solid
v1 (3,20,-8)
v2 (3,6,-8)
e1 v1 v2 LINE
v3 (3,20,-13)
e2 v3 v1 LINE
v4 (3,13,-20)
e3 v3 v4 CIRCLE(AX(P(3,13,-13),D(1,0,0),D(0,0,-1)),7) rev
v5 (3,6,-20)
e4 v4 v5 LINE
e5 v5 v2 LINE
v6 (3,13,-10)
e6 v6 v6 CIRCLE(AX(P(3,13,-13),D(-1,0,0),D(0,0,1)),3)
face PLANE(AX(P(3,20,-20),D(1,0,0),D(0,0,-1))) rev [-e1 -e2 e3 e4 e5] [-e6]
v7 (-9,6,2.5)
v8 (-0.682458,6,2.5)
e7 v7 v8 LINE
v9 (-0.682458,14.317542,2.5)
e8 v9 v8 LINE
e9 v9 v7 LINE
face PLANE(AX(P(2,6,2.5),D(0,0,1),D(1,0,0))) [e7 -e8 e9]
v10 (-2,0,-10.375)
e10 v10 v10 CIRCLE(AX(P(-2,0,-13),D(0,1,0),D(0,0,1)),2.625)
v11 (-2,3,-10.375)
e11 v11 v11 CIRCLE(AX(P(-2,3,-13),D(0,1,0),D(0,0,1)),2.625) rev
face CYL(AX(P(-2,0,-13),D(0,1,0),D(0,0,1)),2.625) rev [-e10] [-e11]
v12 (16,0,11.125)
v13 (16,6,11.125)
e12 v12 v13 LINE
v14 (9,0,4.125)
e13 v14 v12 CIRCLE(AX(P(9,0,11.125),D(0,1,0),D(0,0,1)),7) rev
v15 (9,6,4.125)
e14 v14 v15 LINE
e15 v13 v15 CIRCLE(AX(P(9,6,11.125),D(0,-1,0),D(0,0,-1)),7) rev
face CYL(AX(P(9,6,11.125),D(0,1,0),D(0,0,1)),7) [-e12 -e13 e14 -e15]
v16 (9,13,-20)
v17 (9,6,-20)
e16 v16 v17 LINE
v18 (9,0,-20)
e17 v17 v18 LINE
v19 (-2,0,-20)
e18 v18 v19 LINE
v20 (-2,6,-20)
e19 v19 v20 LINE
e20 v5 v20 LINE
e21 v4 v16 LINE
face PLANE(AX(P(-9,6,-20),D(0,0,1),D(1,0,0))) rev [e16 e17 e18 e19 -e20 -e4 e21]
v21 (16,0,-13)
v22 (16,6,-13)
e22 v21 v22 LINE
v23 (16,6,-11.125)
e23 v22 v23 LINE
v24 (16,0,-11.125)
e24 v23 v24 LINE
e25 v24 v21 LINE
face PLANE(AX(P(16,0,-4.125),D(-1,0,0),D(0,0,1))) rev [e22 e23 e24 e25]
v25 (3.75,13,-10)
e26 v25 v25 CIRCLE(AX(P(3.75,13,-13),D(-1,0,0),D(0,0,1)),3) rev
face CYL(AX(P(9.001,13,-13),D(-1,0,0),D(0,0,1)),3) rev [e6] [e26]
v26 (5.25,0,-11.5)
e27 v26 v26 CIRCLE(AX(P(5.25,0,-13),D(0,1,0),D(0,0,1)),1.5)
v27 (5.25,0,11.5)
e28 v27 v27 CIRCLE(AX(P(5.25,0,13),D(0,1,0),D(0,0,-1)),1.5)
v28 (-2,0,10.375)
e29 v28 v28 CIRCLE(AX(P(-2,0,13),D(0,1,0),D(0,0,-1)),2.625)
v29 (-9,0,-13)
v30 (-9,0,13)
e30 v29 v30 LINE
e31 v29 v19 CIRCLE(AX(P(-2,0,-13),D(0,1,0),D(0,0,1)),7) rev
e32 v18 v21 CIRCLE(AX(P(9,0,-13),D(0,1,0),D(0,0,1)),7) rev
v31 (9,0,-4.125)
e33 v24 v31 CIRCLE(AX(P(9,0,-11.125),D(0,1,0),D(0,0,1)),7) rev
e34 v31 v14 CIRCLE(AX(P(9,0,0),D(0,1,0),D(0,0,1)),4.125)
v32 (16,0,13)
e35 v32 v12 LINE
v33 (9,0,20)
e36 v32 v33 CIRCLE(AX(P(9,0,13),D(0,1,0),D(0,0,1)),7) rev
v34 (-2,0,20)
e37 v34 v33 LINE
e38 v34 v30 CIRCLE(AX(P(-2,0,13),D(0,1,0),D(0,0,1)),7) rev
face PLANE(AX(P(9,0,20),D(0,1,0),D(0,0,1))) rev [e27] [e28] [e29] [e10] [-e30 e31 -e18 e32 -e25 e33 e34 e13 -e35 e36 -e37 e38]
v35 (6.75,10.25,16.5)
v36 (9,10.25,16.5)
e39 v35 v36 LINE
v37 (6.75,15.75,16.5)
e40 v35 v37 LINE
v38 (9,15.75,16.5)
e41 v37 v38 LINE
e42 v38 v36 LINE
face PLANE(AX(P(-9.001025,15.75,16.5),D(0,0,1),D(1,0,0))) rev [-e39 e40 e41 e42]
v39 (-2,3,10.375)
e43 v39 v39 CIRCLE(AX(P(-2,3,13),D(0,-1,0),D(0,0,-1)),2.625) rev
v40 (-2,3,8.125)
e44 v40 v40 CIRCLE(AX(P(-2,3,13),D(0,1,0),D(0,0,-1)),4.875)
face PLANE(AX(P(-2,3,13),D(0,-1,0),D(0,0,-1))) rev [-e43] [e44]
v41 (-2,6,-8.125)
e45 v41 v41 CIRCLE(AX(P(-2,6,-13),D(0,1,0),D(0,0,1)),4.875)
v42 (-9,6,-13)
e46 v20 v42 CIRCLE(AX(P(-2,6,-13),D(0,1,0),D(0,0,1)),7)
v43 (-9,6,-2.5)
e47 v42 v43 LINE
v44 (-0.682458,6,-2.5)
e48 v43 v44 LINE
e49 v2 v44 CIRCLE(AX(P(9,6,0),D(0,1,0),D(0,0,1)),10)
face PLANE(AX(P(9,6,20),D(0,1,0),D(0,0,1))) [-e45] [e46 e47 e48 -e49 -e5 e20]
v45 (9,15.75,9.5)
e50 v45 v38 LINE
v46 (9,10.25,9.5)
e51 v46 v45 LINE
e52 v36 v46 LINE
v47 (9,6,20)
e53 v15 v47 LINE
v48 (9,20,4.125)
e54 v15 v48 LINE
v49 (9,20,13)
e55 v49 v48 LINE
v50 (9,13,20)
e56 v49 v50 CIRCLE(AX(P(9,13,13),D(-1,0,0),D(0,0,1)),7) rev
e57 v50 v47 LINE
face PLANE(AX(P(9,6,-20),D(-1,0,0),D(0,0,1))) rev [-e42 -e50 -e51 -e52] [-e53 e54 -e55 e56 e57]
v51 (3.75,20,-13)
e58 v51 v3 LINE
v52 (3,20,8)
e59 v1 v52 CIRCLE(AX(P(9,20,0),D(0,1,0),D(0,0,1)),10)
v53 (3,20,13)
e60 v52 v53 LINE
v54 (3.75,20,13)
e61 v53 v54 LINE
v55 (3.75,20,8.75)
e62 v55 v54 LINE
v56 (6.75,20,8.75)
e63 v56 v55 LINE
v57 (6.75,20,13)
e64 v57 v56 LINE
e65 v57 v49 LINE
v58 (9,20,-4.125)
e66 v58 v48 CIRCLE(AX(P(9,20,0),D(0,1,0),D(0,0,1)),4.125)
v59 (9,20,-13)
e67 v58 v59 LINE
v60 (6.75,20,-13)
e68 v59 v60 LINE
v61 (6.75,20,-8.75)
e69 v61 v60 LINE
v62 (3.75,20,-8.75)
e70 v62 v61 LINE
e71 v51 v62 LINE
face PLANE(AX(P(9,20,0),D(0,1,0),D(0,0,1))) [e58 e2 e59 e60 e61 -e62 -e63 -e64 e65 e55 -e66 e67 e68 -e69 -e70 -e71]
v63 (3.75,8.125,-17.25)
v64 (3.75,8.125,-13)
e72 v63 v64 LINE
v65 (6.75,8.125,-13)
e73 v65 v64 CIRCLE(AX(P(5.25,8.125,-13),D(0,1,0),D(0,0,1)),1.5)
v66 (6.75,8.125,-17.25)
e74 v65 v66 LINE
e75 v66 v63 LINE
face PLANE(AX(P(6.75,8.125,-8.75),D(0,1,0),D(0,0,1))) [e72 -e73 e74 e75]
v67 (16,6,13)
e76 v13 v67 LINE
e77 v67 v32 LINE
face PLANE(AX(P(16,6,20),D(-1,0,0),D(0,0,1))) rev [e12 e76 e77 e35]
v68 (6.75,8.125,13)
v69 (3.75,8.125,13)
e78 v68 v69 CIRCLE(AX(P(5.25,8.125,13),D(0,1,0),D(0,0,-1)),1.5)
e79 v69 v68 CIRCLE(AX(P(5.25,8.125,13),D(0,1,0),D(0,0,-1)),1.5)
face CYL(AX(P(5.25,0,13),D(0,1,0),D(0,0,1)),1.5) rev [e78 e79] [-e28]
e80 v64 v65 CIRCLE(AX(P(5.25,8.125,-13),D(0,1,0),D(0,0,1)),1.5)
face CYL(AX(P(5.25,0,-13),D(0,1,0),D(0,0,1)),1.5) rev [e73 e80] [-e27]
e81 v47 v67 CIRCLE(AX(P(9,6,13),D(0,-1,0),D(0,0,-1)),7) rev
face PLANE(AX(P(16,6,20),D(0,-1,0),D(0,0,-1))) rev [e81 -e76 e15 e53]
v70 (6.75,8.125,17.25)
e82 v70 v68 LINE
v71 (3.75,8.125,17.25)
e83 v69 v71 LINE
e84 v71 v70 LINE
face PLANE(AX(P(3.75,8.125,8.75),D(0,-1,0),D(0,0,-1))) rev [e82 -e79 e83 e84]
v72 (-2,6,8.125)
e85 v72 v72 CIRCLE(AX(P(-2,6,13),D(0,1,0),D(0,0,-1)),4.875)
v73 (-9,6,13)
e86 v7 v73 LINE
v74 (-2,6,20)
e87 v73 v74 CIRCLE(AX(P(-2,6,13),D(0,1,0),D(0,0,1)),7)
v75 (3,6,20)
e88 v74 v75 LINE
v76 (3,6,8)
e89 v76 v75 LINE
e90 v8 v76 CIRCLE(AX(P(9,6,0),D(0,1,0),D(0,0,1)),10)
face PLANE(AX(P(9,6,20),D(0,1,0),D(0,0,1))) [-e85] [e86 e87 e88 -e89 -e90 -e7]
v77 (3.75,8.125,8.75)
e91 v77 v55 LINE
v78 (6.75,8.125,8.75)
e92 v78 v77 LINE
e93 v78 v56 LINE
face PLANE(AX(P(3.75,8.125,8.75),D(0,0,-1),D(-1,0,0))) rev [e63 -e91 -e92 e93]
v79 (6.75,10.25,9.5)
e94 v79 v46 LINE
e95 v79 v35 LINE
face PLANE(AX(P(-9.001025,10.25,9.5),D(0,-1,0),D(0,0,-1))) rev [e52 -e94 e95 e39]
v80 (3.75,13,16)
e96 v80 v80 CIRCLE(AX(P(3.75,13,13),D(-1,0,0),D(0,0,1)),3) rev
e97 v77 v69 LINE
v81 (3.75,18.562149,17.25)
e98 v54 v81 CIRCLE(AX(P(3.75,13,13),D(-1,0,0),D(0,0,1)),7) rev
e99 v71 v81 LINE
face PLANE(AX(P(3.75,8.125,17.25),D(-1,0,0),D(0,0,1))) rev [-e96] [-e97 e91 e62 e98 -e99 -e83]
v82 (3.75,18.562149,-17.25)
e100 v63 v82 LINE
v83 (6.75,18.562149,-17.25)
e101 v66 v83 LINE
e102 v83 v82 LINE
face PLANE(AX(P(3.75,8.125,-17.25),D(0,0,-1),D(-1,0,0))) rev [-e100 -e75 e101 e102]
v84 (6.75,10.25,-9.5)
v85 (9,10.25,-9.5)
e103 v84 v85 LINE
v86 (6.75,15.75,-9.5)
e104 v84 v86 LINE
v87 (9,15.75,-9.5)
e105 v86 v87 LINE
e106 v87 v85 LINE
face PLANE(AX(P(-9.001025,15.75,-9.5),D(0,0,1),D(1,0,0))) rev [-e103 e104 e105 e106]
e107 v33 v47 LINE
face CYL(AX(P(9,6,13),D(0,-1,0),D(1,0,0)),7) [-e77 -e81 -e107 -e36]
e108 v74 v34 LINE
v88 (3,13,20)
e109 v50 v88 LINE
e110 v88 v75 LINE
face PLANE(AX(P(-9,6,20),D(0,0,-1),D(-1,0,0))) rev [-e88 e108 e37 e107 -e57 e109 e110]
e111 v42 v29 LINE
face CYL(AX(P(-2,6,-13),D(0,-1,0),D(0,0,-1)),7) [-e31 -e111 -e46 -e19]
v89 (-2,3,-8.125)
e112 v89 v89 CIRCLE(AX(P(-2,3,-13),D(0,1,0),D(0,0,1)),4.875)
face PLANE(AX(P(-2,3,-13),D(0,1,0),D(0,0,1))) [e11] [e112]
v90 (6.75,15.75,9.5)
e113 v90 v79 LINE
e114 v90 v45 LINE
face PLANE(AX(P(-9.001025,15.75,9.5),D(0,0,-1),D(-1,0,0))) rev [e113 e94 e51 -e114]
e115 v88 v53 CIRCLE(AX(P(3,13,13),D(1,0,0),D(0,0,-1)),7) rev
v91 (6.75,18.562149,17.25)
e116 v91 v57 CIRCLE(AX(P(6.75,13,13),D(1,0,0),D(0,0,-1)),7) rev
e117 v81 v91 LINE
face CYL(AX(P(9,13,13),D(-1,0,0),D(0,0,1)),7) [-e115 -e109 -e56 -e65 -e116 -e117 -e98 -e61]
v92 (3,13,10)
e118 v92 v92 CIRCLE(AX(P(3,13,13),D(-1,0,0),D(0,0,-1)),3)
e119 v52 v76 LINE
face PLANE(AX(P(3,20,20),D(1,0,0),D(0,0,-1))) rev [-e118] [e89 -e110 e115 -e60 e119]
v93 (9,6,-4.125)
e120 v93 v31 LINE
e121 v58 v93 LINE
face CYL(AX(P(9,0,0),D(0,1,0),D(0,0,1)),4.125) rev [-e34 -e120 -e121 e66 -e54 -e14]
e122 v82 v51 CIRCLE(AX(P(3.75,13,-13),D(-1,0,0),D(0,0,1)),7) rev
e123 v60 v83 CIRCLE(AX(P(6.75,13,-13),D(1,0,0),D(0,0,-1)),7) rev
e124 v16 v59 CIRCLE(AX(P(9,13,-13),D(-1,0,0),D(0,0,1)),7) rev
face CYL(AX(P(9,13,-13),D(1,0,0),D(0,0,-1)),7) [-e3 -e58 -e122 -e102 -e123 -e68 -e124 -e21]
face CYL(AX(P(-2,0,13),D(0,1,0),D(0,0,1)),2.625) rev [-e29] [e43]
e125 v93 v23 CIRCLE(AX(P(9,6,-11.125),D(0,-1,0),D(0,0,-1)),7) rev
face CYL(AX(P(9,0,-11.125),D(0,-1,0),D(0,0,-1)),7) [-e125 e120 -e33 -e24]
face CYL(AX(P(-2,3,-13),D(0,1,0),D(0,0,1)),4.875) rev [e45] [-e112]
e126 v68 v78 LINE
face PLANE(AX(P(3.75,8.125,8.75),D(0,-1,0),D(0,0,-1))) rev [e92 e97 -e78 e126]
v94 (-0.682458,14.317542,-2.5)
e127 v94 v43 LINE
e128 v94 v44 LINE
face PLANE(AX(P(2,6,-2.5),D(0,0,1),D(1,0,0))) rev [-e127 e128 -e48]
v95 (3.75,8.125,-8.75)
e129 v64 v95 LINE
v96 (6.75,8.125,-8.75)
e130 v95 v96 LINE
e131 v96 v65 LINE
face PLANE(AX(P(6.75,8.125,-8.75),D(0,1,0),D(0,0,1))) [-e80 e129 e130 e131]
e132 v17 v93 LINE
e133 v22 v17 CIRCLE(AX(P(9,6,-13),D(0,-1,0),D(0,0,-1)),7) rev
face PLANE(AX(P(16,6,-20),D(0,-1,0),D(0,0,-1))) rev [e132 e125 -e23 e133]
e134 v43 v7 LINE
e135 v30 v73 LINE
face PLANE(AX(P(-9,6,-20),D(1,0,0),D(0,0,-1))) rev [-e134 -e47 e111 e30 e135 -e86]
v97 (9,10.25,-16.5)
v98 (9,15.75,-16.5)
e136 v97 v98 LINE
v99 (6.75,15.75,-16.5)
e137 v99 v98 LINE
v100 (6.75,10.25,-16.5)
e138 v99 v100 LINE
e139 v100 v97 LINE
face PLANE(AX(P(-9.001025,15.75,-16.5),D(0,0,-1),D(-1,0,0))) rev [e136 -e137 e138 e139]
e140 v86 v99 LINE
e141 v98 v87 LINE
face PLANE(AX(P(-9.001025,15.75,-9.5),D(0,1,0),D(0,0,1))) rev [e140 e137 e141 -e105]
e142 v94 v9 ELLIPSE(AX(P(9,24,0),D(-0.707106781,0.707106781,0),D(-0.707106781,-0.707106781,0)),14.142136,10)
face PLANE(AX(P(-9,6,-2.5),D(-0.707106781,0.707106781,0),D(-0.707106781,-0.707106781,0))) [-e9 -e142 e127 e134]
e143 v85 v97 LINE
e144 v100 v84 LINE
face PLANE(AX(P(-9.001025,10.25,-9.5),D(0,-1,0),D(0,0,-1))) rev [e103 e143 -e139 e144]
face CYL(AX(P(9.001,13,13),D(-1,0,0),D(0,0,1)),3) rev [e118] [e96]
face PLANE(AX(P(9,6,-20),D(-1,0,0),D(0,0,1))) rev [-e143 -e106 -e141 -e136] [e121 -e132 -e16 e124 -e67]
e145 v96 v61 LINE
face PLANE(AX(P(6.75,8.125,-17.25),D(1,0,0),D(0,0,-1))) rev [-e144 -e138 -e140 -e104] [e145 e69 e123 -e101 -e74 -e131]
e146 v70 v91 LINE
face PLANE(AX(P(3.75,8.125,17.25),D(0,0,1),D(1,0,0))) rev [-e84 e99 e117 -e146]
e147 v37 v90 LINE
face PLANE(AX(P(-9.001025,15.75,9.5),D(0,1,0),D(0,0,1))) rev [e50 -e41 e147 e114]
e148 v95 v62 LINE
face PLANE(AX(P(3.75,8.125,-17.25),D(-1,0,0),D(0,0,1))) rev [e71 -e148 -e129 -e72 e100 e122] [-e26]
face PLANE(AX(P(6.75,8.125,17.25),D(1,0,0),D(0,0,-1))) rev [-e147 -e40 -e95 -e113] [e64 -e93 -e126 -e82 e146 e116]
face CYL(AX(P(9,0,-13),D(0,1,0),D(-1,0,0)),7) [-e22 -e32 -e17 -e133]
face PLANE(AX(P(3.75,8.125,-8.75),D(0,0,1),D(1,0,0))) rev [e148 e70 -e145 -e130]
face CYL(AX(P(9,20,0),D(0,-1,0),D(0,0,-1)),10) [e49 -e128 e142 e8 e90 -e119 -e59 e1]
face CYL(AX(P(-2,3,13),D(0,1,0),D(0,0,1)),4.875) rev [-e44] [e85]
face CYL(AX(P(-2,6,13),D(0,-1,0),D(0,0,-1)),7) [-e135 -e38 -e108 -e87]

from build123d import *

# Parameters (mm, degrees)
SKETCH1_W                = 18
SKETCH1_H                = 40
BOSS_EXTRUDE1_DEPTH      = 6
BOSS_EXTRUDE2_DEPTH      = 14
SKETCH3_R                = 4.125
CUT_EXTRUDE1_DEPTH       = 30.681644159
FILLET1_R                = 7
SKETCH12_W               = 3
SKETCH12_H               = 8.5
CUT_EXTRUDE7_DEPTH       = 11.875
SKETCH13_R               = 1.5
CUT_EXTRUDE8_DEPTH       = 25.940241077
CUT_EXTRUDE9_REACH       = 32.725
SKETCH14_R               = 3
CUT_EXTRUDE10_REACH      = 35.526
SKETCH15_W               = 7
SKETCH15_H               = 5.5
SKETCH7_W                = 15.875
SKETCH7_H                = 6
BOSS_EXTRUDE3_DEPTH      = 7
FILLET2_R                = 7
SKETCH8_R                = 2.625
CUT_EXTRUDE4_DEPTH       = 30.189039039
BOSS_EXTRUDE4_DEPTH      = 2.5
BOSS_EXTRUDE4_DEPTH_BACK = 2.5
SKETCH10_R               = 4.875
CUT_EXTRUDE5_DEPTH       = 3


with BuildPart() as part:
    # Sketch1 → Boss-Extrude1 (new body)
    with BuildSketch(Plane(origin=(0, 0, 0), x_dir=(1, 0, 0), z_dir=(0, 1, 0))):
        Rectangle(SKETCH1_W, SKETCH1_H)
    extrude(amount=BOSS_EXTRUDE1_DEPTH)

    # Sketch2 → Boss-Extrude2 (add)
    with BuildSketch(Plane(origin=(0, 6, 0), x_dir=(1, 0, 0), z_dir=(0, 1, 0))):
        with BuildLine():
            Line((3, -20), (3, -8))
            ThreePointArc((3, -8), (-1, 0), (3, 8))
            Line((3, 8), (3, 20))
            Line((3, 20), (9, 20))
            Line((9, 20), (9, -20))
            Line((9, -20), (3, -20))
        make_face()
    extrude(amount=BOSS_EXTRUDE2_DEPTH)

    # Sketch3 → Cut-Extrude1 (cut, through all)
    with BuildSketch(Plane(origin=(0, 20, 0), x_dir=(1, 0, 0), z_dir=(0, 1, 0))):
        with Locations((9, 0)):
            Circle(SKETCH3_R)
    extrude(amount=-CUT_EXTRUDE1_DEPTH, mode=Mode.SUBTRACT)

    # Fillet1
    fillet1_edges = [part.edges().sort_by_distance(p)[0] for p in [
        (6, 20, 20),
        (6, 20, -20),
    ]]
    fillet(fillet1_edges, radius=FILLET1_R)

    # Sketch12 → Cut-Extrude7 (cut)
    with BuildSketch(Plane(origin=(0, 20, 0), x_dir=(1, 0, 0), z_dir=(0, 1, 0))):
        with Locations((5.25, 13)):
            Rectangle(SKETCH12_W, SKETCH12_H)
        with Locations((5.25, -13)):
            Rectangle(SKETCH12_W, SKETCH12_H)
    extrude(amount=-CUT_EXTRUDE7_DEPTH, mode=Mode.SUBTRACT)

    # Sketch13 → Cut-Extrude8 (cut, through all)
    with BuildSketch(Plane(origin=(0, 8.125, 0), x_dir=(1, 0, 0), z_dir=(0, 1, 0))):
        with Locations(Location((5.25, 13, 0), (0, 0, 270))):
            Circle(SKETCH13_R)
        with Locations((5.25, -13)):
            Circle(SKETCH13_R)
    extrude(amount=-CUT_EXTRUDE8_DEPTH, mode=Mode.SUBTRACT)

    # Sketch14 → Cut-Extrude9 (cut, up to next)
    with BuildSketch(Plane.ZY.offset(-3), mode=Mode.PRIVATE) as cut_extrude9_sk1:
        with Locations((-13, 13)):
            Circle(SKETCH14_R)
    cut_extrude9_tool1 = extrude(cut_extrude9_sk1.sketch, amount=-CUT_EXTRUDE9_REACH, mode=Mode.PRIVATE) & part.part
    # Sketch14 → Cut-Extrude9 (cut, up to next)
    with BuildSketch(Plane.ZY.offset(-3), mode=Mode.PRIVATE) as cut_extrude9_sk2:
        with Locations((13, 13)):
            Circle(SKETCH14_R)
    cut_extrude9_tool2 = extrude(cut_extrude9_sk2.sketch, amount=-CUT_EXTRUDE9_REACH, mode=Mode.PRIVATE) & part.part
    add(cut_extrude9_tool1.solids().sort_by_distance((3, 13, -13))[0], mode=Mode.SUBTRACT)
    add(cut_extrude9_tool2.solids().sort_by_distance((3, 13, 13))[0], mode=Mode.SUBTRACT)

    # Sketch15 → Cut-Extrude10 (cut, up to next)
    with BuildSketch(Plane(origin=(9, 0, 0), x_dir=(0, 0, -1), z_dir=(1, 0, 0)), mode=Mode.PRIVATE) as cut_extrude10_sk1:
        with Locations((13, 13)):
            Rectangle(SKETCH15_W, SKETCH15_H)
    cut_extrude10_tool1 = extrude(cut_extrude10_sk1.sketch, amount=-CUT_EXTRUDE10_REACH, mode=Mode.PRIVATE) & part.part
    # Sketch15 → Cut-Extrude10 (cut, up to next)
    with BuildSketch(Plane(origin=(9, 0, 0), x_dir=(0, 0, -1), z_dir=(1, 0, 0)), mode=Mode.PRIVATE) as cut_extrude10_sk2:
        with Locations((-13, 13)):
            Rectangle(SKETCH15_W, SKETCH15_H)
    cut_extrude10_tool2 = extrude(cut_extrude10_sk2.sketch, amount=-CUT_EXTRUDE10_REACH, mode=Mode.PRIVATE) & part.part
    add(cut_extrude10_tool1.solids().sort_by_distance((9, 13, -13))[0], mode=Mode.SUBTRACT)
    add(cut_extrude10_tool2.solids().sort_by_distance((9, 13, 13))[0], mode=Mode.SUBTRACT)

    # Sketch7 → Boss-Extrude3 (add)
    with BuildSketch(Plane(origin=(9, 0, 0), x_dir=(0, 0, -1), z_dir=(1, 0, 0))):
        with Locations((-12.0625, 3)):
            Rectangle(SKETCH7_W, SKETCH7_H)
        with Locations((12.0625, 3)):
            Rectangle(SKETCH7_W, SKETCH7_H)
    extrude(amount=BOSS_EXTRUDE3_DEPTH)

    # Fillet2
    fillet2_edges = [part.edges().sort_by_distance(p)[0] for p in [
        (-9, 3, -20),
        (16, 3, -20),
        (16, 3, 20),
        (-9, 3, 20),
        (16, 3, -4.125),
        (16, 3, 4.125),
    ]]
    fillet(fillet2_edges, radius=FILLET2_R - 0.0001)  # a hair under: the kernel refuses the full size

    # Sketch8 → Cut-Extrude4 (cut, through all)
    with BuildSketch(Plane(origin=(0, 6, 0), x_dir=(1, 0, 0), z_dir=(0, 1, 0))):
        with Locations(Location((-2, 13, 0), (0, 0, 270))):
            Circle(SKETCH8_R)
        with Locations(Location((-2, -13, 0), (0, 0, 90))):
            Circle(SKETCH8_R)
    extrude(amount=-CUT_EXTRUDE4_DEPTH, mode=Mode.SUBTRACT)

    # Sketch9 → Boss-Extrude4 (add, two sides: drawn at the far end of the back side and taken through both)
    with BuildSketch(Plane.XY.offset(-BOSS_EXTRUDE4_DEPTH_BACK)):
        Polygon((-9, 6), (2, 17), (2, 6), align=None)
    extrude(amount=BOSS_EXTRUDE4_DEPTH + BOSS_EXTRUDE4_DEPTH_BACK)

    # Sketch10 → Cut-Extrude5 (cut)
    with BuildSketch(Plane(origin=(0, 6, 0), x_dir=(1, 0, 0), z_dir=(0, 1, 0))):
        with Locations(Location((-2, 13, 0), (0, 0, 270))):
            Circle(SKETCH10_R)
        with Locations(Location((-2, -13, 0), (0, 0, 90))):
            Circle(SKETCH10_R)
    extrude(amount=-CUT_EXTRUDE5_DEPTH, mode=Mode.SUBTRACT)


solid = part.part
